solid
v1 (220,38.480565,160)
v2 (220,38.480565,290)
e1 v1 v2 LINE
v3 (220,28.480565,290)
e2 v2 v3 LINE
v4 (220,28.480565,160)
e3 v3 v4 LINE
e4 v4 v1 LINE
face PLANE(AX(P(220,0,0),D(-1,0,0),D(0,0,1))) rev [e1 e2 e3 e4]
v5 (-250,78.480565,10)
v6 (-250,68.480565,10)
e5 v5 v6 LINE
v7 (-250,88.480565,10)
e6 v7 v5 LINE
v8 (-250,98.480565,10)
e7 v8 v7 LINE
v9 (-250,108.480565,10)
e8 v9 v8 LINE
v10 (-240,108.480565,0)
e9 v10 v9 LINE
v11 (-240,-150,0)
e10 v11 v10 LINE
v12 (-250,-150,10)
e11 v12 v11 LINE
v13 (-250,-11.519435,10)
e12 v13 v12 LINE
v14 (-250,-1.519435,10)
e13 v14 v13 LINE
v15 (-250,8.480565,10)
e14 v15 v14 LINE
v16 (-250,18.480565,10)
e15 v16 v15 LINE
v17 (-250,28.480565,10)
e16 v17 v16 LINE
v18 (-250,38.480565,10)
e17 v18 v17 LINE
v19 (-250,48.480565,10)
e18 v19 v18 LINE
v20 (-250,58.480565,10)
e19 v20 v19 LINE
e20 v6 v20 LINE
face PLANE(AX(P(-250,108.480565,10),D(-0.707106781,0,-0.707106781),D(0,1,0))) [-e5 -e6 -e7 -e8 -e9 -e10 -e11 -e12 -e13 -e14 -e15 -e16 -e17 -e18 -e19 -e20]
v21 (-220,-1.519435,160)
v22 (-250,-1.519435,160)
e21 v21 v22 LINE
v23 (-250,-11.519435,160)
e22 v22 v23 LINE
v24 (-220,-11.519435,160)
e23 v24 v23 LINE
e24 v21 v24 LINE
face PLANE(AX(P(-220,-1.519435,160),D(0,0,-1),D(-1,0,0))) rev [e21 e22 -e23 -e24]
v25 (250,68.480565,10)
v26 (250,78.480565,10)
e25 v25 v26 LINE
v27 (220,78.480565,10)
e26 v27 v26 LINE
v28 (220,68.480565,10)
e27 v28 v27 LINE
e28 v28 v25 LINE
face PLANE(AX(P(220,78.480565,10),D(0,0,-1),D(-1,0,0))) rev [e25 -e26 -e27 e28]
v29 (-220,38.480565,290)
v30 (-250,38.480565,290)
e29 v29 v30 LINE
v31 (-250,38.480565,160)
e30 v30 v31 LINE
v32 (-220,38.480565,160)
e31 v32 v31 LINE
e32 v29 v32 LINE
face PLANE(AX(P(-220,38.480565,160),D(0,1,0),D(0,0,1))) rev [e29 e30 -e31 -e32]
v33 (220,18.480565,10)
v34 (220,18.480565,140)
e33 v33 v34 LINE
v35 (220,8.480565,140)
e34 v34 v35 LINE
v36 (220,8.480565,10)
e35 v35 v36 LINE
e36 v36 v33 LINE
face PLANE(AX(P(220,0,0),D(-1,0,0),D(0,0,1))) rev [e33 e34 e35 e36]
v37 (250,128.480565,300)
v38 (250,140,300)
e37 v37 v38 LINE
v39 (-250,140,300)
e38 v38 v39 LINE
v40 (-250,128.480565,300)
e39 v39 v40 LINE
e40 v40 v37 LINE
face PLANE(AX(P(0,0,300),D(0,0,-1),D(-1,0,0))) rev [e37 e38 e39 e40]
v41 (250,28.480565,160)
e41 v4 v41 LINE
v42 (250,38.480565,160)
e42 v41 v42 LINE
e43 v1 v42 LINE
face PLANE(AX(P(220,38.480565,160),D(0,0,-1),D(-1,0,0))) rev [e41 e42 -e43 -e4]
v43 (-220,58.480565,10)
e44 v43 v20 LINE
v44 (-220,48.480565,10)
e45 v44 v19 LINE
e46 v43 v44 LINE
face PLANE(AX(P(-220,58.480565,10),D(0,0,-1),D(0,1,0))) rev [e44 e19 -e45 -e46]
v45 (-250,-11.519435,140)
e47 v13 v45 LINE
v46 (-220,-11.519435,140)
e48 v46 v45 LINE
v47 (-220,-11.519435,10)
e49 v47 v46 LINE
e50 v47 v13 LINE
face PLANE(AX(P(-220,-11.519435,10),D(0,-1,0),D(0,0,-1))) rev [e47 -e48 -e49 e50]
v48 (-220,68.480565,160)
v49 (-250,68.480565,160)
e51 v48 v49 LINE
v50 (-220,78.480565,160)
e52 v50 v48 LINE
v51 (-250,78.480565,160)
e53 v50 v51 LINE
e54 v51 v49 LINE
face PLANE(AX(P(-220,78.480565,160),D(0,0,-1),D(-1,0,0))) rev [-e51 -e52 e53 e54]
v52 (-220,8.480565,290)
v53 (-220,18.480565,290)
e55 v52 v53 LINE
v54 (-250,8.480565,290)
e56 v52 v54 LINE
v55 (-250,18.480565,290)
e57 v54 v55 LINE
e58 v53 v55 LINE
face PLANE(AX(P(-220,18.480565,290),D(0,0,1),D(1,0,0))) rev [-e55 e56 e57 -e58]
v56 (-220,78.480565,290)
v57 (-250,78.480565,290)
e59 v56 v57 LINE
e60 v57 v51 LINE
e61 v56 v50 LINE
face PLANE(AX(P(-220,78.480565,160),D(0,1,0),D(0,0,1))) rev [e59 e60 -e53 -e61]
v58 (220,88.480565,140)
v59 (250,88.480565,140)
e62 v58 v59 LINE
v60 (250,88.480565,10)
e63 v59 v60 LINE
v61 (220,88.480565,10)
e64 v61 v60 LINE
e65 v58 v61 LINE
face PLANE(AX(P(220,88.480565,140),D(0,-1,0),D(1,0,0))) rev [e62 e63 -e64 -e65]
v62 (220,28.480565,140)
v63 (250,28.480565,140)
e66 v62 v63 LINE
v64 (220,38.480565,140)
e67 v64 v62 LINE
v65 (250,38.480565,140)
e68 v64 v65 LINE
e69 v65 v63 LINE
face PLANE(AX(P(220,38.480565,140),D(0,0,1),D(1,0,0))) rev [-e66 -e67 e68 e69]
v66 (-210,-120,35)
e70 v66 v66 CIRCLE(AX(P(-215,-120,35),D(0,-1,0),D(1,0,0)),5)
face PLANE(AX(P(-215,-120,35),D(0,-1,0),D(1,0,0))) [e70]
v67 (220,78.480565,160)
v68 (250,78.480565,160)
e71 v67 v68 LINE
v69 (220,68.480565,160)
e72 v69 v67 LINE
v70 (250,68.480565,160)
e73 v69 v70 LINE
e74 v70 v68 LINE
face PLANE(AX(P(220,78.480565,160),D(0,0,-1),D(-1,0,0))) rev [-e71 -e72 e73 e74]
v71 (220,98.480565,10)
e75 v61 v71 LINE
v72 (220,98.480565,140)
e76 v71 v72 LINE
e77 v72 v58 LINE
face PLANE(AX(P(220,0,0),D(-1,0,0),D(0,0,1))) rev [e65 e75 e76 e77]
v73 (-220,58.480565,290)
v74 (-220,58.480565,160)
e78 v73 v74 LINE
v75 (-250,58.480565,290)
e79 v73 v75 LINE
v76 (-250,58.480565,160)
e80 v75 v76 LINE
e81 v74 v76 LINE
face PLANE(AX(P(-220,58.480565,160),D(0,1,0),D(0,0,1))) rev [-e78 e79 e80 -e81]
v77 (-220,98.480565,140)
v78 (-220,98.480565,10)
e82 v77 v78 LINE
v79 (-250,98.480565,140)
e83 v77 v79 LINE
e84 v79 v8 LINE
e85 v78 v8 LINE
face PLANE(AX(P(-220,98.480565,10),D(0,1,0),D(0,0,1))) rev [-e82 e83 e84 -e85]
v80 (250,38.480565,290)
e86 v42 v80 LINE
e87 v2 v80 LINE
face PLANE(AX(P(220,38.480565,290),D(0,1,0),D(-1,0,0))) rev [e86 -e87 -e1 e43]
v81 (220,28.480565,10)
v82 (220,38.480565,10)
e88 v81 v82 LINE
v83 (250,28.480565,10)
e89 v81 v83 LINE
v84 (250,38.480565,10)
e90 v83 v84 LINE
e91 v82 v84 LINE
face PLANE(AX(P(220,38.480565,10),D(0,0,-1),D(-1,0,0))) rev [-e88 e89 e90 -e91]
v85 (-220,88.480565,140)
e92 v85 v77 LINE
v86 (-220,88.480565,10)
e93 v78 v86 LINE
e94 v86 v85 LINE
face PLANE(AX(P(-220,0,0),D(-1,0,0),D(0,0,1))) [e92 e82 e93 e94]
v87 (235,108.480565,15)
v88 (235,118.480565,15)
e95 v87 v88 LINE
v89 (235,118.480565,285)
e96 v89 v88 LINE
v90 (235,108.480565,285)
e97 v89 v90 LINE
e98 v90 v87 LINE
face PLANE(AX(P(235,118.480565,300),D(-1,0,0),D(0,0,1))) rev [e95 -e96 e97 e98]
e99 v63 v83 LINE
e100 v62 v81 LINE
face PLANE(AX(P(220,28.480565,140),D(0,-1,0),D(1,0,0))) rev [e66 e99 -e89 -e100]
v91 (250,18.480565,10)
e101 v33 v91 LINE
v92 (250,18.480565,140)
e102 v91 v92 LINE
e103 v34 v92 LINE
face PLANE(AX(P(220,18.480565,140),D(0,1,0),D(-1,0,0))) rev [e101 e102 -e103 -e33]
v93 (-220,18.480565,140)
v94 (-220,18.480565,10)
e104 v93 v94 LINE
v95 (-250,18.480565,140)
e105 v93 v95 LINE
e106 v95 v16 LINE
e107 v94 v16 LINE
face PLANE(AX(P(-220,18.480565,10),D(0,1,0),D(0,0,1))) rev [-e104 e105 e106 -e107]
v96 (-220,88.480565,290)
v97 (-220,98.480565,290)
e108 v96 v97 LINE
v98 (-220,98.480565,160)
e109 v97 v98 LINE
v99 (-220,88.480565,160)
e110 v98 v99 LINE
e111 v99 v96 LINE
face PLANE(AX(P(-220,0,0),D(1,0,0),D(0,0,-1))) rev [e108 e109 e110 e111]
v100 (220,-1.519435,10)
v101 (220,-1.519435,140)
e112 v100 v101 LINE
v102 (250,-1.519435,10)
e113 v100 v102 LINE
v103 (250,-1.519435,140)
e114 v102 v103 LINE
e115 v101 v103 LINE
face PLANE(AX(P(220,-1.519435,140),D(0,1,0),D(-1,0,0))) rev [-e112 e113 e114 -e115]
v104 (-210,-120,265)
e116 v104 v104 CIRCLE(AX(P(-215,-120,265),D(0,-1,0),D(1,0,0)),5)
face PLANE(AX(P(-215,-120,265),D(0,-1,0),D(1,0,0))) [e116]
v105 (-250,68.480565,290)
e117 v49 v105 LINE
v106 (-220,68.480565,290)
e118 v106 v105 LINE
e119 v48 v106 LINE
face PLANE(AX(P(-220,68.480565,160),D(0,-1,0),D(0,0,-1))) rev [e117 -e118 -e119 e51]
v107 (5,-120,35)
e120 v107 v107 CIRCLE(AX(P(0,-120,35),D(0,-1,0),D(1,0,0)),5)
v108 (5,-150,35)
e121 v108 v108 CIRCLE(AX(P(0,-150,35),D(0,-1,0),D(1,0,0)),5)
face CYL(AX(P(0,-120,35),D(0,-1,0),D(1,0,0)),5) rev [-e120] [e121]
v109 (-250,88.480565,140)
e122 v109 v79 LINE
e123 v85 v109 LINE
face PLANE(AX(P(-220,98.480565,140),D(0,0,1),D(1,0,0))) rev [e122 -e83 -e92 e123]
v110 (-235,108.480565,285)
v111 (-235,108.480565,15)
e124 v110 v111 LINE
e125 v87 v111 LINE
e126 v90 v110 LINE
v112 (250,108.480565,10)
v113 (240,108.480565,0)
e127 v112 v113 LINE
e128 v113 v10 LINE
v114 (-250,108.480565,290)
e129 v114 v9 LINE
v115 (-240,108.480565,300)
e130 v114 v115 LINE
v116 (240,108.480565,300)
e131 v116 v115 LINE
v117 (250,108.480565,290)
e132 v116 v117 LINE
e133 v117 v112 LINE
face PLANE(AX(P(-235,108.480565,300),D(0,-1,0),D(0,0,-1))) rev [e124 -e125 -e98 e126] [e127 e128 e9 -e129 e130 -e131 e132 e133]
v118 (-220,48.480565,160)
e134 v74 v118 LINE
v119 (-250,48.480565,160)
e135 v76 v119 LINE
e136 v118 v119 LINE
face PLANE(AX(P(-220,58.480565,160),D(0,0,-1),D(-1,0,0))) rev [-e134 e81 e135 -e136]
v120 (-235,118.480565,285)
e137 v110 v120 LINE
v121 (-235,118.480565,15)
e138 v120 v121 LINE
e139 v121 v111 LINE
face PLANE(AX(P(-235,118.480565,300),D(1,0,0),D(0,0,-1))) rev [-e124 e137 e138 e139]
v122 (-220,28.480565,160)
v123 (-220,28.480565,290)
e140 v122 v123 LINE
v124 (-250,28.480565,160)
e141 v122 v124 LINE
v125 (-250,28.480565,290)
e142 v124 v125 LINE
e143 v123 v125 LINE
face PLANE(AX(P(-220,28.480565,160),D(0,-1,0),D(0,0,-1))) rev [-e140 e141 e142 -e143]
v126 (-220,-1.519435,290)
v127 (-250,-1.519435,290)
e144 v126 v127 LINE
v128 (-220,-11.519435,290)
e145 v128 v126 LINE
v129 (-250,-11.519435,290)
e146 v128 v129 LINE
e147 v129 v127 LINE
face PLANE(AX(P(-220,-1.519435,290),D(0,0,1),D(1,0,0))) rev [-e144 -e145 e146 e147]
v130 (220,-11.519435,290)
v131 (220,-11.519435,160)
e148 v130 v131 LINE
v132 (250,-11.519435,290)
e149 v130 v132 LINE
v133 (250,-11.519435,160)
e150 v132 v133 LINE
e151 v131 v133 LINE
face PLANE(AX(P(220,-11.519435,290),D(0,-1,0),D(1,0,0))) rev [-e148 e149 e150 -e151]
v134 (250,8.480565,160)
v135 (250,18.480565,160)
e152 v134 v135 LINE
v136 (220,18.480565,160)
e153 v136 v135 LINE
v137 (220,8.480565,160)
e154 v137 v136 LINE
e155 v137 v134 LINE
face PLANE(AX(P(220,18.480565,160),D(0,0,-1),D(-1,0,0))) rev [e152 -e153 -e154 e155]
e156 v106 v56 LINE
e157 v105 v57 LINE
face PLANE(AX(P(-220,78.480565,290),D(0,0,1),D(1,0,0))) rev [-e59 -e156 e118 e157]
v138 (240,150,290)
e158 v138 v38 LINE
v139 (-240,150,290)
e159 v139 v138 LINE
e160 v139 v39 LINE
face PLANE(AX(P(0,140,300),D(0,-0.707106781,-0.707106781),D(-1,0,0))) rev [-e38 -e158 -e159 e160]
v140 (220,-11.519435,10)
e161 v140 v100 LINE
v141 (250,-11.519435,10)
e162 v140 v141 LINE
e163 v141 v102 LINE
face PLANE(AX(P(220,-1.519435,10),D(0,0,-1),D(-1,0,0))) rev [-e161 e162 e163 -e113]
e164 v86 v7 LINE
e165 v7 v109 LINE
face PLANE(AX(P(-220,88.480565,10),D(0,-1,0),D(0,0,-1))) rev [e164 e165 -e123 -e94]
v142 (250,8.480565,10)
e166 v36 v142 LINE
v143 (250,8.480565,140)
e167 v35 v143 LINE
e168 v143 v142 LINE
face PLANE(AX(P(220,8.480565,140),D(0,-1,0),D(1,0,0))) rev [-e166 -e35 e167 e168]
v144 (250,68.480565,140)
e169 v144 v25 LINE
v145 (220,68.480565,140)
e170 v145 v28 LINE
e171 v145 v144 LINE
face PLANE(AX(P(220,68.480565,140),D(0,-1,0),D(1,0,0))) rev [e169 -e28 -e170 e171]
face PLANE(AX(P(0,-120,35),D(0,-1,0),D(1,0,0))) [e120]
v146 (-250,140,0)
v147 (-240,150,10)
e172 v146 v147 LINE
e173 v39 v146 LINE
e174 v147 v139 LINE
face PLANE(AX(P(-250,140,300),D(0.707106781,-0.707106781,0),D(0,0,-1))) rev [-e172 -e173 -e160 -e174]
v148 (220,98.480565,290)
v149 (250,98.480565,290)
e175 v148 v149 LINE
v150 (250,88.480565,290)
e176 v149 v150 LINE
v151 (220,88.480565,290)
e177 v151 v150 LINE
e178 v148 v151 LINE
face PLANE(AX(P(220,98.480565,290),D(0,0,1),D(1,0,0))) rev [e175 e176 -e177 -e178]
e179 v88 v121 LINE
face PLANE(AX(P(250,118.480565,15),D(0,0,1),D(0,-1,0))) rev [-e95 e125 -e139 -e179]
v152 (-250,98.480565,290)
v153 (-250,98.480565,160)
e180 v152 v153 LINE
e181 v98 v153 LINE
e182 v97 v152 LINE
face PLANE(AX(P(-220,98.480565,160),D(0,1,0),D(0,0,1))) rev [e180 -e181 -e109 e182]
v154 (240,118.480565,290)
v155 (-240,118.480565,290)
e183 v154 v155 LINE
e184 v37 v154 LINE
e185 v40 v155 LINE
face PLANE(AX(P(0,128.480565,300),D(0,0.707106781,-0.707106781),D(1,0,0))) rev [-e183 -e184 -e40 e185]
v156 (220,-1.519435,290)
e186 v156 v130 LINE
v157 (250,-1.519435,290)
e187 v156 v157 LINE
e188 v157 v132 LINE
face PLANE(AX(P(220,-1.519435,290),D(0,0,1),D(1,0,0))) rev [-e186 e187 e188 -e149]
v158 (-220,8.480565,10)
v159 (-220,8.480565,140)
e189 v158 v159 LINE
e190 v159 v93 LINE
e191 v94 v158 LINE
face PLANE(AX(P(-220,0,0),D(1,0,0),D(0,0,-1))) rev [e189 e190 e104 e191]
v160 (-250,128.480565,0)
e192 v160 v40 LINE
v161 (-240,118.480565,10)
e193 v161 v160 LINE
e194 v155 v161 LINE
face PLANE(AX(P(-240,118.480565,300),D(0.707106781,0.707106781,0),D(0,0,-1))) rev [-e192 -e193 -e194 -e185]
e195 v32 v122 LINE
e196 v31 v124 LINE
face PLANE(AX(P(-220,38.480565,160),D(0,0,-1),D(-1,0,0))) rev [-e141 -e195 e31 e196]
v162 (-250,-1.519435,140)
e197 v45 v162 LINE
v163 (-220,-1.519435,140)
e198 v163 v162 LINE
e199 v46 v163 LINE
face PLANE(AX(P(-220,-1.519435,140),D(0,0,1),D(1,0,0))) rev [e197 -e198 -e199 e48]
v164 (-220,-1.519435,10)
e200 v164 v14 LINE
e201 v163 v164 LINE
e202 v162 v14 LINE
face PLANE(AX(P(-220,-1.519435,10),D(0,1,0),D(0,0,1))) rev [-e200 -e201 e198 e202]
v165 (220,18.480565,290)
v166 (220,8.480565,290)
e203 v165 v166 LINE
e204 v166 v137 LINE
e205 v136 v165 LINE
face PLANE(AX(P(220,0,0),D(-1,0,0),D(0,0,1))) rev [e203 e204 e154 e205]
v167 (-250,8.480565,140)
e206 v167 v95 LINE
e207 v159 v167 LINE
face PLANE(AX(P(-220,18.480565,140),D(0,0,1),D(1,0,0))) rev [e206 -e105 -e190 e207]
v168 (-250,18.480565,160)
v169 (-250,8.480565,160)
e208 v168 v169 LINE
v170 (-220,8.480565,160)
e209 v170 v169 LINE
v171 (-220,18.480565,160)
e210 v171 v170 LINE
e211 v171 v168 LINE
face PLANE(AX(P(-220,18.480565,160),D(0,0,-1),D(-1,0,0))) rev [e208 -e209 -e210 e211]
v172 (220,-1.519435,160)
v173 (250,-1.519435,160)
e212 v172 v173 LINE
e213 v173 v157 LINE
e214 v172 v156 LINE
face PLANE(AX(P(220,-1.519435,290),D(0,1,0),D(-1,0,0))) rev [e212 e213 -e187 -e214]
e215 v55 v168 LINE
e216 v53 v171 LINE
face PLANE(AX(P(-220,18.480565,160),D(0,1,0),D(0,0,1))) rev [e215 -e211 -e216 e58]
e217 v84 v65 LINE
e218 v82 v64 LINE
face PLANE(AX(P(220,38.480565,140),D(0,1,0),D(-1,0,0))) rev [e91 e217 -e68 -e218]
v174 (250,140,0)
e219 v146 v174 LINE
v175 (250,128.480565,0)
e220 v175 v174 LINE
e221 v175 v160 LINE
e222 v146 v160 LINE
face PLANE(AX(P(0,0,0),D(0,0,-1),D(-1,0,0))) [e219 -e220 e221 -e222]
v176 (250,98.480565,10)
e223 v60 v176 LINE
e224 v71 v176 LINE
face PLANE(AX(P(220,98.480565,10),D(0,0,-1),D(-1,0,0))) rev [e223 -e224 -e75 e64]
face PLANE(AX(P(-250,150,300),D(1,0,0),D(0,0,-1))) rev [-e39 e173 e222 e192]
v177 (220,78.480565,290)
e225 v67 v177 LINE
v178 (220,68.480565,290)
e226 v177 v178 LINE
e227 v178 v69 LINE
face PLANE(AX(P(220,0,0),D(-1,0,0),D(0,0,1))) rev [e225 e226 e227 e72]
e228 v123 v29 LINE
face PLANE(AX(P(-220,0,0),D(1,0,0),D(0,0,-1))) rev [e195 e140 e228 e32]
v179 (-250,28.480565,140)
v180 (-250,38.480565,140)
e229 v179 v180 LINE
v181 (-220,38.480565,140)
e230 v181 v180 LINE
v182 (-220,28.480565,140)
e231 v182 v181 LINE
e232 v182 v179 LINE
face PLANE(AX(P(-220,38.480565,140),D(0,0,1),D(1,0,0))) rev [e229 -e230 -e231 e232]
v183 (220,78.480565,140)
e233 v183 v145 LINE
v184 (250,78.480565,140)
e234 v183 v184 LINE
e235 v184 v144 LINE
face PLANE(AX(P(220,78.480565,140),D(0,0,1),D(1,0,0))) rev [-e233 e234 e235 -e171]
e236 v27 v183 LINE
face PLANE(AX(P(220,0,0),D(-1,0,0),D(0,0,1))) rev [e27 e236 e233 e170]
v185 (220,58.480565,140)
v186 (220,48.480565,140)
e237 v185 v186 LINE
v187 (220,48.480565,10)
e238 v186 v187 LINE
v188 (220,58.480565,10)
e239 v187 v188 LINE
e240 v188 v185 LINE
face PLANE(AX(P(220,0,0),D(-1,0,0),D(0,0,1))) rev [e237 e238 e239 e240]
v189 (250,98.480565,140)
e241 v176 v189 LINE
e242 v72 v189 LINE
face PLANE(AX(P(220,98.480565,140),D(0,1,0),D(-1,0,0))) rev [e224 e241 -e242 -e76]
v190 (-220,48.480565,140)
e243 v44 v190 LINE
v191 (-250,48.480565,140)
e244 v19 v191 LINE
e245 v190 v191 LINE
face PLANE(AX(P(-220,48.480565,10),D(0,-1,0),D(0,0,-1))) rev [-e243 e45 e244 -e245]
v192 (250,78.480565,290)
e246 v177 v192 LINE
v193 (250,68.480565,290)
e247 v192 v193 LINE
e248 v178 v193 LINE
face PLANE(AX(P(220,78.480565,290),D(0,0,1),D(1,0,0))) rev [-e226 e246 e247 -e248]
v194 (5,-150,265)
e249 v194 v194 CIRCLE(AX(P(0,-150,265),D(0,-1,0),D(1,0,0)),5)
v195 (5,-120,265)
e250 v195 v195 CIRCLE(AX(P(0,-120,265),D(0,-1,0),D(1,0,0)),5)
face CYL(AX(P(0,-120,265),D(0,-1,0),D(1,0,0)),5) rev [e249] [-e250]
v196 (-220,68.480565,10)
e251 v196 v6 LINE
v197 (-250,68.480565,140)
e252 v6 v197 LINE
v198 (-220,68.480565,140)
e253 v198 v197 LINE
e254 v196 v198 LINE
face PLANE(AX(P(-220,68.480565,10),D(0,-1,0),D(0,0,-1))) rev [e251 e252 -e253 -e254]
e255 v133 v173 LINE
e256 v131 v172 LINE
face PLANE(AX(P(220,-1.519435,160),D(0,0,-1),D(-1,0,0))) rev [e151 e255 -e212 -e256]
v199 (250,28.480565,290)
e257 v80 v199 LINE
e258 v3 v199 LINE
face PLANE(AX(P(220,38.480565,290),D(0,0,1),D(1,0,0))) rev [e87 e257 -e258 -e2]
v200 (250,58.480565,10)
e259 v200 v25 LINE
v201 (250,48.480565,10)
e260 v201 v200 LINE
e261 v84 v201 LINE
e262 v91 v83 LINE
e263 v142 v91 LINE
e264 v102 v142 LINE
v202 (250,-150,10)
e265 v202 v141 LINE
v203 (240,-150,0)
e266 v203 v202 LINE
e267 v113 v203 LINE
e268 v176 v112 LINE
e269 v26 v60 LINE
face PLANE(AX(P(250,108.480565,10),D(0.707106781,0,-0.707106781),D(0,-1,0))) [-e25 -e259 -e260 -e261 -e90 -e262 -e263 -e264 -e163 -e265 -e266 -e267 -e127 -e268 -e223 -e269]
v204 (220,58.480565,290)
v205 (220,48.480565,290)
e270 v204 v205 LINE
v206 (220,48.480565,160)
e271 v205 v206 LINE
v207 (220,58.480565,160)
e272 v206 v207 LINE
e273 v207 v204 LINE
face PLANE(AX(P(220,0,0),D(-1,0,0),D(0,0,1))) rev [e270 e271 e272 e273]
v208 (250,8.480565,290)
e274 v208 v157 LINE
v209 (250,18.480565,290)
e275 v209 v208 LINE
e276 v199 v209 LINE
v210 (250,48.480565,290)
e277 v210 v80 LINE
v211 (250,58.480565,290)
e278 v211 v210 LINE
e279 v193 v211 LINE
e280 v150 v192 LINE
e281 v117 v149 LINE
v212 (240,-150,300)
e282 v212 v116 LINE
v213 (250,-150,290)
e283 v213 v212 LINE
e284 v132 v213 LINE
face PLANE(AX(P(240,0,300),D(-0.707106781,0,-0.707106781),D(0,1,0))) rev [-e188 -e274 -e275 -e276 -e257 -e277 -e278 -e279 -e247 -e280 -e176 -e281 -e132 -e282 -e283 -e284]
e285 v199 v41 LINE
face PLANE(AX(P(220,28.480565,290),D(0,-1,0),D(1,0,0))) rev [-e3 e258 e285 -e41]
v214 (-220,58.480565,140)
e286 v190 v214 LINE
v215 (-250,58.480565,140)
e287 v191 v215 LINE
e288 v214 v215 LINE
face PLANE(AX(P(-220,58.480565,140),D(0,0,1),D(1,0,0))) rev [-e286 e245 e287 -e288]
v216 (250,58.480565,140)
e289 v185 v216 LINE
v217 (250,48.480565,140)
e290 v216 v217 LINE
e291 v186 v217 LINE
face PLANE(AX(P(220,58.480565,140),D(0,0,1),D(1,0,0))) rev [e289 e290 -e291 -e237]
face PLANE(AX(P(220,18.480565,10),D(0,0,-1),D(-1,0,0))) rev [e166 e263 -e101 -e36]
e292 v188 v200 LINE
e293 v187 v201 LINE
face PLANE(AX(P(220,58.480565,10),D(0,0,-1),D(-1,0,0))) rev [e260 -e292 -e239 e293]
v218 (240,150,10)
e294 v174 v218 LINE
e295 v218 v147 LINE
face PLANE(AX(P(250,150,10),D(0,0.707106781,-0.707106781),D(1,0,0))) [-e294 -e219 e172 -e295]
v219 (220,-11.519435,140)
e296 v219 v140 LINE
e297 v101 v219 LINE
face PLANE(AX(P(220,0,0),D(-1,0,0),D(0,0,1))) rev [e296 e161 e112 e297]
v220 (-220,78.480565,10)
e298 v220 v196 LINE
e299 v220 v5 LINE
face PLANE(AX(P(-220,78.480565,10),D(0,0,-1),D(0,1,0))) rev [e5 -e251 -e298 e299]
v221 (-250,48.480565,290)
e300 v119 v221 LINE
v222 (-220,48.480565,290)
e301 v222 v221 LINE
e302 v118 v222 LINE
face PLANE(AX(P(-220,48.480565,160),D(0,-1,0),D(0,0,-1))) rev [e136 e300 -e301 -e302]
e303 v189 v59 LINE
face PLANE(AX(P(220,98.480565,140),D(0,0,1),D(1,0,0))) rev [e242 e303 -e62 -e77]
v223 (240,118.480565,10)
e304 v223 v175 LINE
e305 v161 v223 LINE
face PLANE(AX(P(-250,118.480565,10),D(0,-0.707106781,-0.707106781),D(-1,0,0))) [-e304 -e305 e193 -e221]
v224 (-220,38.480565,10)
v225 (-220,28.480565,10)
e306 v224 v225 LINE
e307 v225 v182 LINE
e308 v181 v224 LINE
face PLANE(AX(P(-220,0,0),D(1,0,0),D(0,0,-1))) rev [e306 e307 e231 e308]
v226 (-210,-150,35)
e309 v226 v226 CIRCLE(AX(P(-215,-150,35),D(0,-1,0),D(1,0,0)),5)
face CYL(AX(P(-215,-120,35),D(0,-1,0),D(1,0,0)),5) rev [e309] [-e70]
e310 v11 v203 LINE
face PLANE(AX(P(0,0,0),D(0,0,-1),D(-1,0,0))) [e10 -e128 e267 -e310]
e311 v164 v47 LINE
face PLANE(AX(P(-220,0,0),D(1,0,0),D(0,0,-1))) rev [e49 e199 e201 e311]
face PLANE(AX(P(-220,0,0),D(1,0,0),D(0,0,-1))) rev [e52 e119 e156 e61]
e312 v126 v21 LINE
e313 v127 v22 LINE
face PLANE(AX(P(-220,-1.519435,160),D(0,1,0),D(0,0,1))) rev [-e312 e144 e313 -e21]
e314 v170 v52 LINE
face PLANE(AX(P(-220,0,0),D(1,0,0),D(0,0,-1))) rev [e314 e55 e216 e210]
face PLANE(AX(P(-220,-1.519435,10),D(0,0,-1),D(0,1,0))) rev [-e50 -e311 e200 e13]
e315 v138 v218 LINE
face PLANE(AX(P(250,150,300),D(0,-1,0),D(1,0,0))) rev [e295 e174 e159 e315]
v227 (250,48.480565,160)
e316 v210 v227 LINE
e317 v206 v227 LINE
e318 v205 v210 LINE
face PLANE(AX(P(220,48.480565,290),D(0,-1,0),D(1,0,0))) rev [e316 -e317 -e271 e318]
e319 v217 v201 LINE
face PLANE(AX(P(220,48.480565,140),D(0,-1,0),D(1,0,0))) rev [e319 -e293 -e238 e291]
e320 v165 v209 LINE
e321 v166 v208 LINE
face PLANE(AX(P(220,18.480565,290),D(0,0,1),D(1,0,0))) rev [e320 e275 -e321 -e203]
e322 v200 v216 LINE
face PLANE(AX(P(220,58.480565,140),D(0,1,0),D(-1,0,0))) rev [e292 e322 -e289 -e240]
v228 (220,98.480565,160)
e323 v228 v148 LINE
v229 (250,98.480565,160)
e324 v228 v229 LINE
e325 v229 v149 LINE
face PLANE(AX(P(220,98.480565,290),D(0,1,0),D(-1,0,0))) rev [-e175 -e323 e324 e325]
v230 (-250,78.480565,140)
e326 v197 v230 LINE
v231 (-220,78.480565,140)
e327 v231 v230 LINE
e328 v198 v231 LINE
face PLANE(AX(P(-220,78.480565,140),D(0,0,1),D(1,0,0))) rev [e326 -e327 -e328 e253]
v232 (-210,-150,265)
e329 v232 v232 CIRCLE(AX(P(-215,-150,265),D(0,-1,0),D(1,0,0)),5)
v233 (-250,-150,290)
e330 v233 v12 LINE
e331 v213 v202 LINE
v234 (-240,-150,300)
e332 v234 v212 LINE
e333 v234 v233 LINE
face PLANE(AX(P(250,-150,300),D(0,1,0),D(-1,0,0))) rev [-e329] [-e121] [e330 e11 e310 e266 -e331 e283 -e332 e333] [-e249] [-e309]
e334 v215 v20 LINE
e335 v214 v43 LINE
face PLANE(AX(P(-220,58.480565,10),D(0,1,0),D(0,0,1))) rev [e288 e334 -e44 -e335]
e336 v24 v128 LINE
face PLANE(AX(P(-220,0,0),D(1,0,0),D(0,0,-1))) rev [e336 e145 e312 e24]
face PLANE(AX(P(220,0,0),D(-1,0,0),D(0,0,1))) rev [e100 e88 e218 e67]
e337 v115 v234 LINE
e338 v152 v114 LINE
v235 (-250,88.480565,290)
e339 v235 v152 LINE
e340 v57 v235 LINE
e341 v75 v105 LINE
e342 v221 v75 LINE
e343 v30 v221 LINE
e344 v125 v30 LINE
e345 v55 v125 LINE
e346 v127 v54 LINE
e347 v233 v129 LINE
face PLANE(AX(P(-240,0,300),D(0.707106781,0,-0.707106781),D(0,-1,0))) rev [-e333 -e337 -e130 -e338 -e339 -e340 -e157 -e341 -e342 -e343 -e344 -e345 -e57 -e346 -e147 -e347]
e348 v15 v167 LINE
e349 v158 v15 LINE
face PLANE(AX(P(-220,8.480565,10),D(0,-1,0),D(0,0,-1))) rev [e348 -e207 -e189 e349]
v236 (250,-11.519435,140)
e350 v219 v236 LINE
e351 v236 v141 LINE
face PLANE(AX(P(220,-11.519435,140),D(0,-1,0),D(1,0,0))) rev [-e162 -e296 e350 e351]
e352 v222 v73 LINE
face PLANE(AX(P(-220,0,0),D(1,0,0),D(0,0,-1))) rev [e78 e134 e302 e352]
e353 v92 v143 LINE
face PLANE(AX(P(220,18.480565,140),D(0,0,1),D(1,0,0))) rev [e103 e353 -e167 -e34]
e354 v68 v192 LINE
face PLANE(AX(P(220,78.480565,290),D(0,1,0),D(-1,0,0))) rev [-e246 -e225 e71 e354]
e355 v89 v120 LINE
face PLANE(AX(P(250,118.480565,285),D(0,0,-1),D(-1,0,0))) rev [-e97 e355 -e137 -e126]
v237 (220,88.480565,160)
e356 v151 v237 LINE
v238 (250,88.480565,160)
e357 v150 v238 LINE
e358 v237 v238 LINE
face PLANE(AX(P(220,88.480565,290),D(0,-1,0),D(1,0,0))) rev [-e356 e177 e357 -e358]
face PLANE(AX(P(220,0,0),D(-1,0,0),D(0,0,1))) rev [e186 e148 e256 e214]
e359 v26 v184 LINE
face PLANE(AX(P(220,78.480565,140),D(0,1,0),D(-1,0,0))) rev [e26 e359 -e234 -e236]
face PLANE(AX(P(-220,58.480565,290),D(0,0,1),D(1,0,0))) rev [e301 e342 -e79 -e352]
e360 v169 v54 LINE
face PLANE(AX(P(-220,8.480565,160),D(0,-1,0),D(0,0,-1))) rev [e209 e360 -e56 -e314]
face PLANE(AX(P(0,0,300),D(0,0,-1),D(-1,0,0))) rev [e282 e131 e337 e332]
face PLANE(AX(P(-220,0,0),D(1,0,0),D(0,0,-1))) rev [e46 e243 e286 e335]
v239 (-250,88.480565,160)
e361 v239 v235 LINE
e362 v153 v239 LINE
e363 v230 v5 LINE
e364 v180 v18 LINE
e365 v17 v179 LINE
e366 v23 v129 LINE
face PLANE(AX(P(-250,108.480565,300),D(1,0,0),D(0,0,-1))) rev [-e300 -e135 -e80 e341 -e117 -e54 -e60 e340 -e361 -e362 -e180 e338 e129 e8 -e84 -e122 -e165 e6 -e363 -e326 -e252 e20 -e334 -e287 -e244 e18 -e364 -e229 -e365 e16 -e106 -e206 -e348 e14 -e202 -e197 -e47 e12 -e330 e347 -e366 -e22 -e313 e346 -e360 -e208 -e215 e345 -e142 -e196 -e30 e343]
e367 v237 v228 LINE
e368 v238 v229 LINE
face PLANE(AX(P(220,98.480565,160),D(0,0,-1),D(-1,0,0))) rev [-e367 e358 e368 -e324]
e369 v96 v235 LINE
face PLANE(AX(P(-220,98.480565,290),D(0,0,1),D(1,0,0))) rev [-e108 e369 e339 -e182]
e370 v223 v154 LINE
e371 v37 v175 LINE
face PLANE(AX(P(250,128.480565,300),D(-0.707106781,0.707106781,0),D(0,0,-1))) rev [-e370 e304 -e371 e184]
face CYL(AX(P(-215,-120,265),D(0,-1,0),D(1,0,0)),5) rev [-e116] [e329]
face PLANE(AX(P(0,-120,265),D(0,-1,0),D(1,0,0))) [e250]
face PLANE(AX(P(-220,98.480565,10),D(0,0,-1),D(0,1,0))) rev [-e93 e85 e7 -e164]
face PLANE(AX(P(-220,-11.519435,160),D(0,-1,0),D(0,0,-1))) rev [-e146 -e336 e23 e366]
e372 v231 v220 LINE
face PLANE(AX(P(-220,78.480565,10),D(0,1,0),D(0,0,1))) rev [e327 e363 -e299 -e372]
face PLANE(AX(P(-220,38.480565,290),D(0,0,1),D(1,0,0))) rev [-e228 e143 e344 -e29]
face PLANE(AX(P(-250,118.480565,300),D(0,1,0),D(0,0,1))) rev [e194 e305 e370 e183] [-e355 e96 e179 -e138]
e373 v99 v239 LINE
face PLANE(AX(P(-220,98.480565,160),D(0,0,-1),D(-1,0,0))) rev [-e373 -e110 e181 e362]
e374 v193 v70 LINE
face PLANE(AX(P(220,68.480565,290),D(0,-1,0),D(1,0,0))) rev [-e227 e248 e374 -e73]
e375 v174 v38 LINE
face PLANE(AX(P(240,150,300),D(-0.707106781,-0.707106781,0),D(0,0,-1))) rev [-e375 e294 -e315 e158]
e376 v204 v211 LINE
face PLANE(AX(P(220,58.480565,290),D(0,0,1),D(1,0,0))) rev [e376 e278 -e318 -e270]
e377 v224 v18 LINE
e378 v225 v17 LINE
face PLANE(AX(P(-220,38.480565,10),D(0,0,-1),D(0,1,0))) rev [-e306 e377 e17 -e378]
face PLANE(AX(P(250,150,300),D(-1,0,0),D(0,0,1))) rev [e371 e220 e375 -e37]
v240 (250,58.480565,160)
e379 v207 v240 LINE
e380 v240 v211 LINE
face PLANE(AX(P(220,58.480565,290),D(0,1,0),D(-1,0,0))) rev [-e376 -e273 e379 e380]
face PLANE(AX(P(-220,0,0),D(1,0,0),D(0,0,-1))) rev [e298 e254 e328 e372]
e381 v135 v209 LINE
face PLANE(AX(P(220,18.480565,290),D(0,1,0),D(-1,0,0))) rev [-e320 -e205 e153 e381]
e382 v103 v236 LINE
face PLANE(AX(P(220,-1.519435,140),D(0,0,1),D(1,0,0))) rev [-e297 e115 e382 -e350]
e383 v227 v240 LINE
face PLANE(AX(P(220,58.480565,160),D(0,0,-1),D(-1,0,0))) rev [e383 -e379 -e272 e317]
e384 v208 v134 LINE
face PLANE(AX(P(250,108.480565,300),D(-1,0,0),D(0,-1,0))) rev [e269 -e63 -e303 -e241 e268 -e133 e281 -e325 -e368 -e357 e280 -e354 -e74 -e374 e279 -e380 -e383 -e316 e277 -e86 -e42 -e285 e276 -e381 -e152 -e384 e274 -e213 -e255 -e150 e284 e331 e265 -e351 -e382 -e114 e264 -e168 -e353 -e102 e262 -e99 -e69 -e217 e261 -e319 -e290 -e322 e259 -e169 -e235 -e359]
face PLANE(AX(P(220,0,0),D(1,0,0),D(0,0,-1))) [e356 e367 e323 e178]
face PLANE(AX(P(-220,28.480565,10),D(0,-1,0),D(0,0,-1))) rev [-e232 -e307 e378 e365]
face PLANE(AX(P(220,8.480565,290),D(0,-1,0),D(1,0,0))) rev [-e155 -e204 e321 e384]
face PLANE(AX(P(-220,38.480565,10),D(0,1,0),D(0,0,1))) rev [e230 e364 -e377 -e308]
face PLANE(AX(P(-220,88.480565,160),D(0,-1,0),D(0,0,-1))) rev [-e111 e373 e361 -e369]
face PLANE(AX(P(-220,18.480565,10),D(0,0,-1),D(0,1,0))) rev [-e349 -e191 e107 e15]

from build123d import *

# Parameters (mm, degrees)
BOSS_EXTRUDE1_DEPTH = 300
SKETCH2_W           = 15
SKETCH2_H           = 10
CUT_EXTRUDE1_DEPTH  = 603.07972894
SKETCH4_W           = 130
SKETCH4_H           = 10
CUT_EXTRUDE2_DEPTH  = 30
SKETCH7_W           = 130
SKETCH7_H           = 10
CUT_EXTRUDE3_DEPTH  = 30
CHAMFER1_SIZE       = 10
CHAMFER2_SIZE       = 10
CHAMFER3_SIZE       = 10
SKETCH8_R           = 5
CUT_EXTRUDE4_DEPTH  = 30


with BuildPart() as part:
    # Sketch1 → Boss-Extrude1 (new body)
    with BuildSketch(Plane.XY):
        Polygon((250, 118.480565371), (235, 118.480565371), (235, 108.480565371), (250, 108.480565371), (250, -150), (-250, -150), (-250, 108.480565371), (-235, 108.480565371), (-235, 118.480565371), (-250, 118.480565371), (-250, 150), (250, 150), align=None)
    extrude(amount=BOSS_EXTRUDE1_DEPTH)

    # Sketch2 → Cut-Extrude1 (cut, through all)
    with BuildSketch(Plane.ZY.offset(250)):
        with Locations((292.5, 113.480565371)):
            Rectangle(SKETCH2_W, SKETCH2_H)
        with Locations((7.5, 113.480565371)):
            Rectangle(SKETCH2_W, SKETCH2_H)
    extrude(amount=-CUT_EXTRUDE1_DEPTH, mode=Mode.SUBTRACT)

    # Sketch4 → Cut-Extrude2 (cut)
    with BuildSketch(Plane.ZY.offset(250)):
        with Locations((75, 93.480565371)):
            Rectangle(SKETCH4_W, SKETCH4_H)
        with Locations((225, 93.480565371)):
            Rectangle(SKETCH4_W, SKETCH4_H)
        with Locations((225, 73.480565371)):
            Rectangle(SKETCH4_W, SKETCH4_H)
        with Locations((225, 53.480565371)):
            Rectangle(SKETCH4_W, SKETCH4_H)
        with Locations((225, 33.480565371)):
            Rectangle(SKETCH4_W, SKETCH4_H)
        with Locations((225, 13.480565371)):
            Rectangle(SKETCH4_W, SKETCH4_H)
        with Locations((225, -6.519434629)):
            Rectangle(SKETCH4_W, SKETCH4_H)
        with Locations((75, 73.480565371)):
            Rectangle(SKETCH4_W, SKETCH4_H)
        with Locations((75, 53.480565371)):
            Rectangle(SKETCH4_W, SKETCH4_H)
        with Locations((75, 33.480565371)):
            Rectangle(SKETCH4_W, SKETCH4_H)
        with Locations((75, 13.480565371)):
            Rectangle(SKETCH4_W, SKETCH4_H)
        with Locations((75, -6.519434629)):
            Rectangle(SKETCH4_W, SKETCH4_H)
    extrude(amount=-CUT_EXTRUDE2_DEPTH, mode=Mode.SUBTRACT)

    # Sketch7 → Cut-Extrude3 (cut)
    with BuildSketch(Plane(origin=(250, 0, 0), x_dir=(0, 0, -1), z_dir=(1, 0, 0))):
        with Locations((-225, 93.480565371)):
            Rectangle(SKETCH7_W, SKETCH7_H)
        with Locations((-75, 93.480565371)):
            Rectangle(SKETCH7_W, SKETCH7_H)
        with Locations((-75, 73.480565371)):
            Rectangle(SKETCH7_W, SKETCH7_H)
        with Locations((-75, 53.480565371)):
            Rectangle(SKETCH7_W, SKETCH7_H)
        with Locations((-75, 33.480565371)):
            Rectangle(SKETCH7_W, SKETCH7_H)
        with Locations((-75, 13.480565371)):
            Rectangle(SKETCH7_W, SKETCH7_H)
        with Locations((-75, -6.519434629)):
            Rectangle(SKETCH7_W, SKETCH7_H)
        with Locations((-225, 73.480565371)):
            Rectangle(SKETCH7_W, SKETCH7_H)
        with Locations((-225, 53.480565371)):
            Rectangle(SKETCH7_W, SKETCH7_H)
        with Locations((-225, 33.480565371)):
            Rectangle(SKETCH7_W, SKETCH7_H)
        with Locations((-225, 13.480565371)):
            Rectangle(SKETCH7_W, SKETCH7_H)
        with Locations((-225, -6.519434629)):
            Rectangle(SKETCH7_W, SKETCH7_H)
    extrude(amount=-CUT_EXTRUDE3_DEPTH, mode=Mode.SUBTRACT)

    # Chamfer1
    chamfer1_edges = [part.edges().sort_by_distance(p)[0] for p in [
        (0, 150, 0),
        (-250, 150, 150),
        (250, 150, 150),
        (0, 150, 300),
    ]]
    chamfer(chamfer1_edges, length=CHAMFER1_SIZE)

    # Chamfer2
    chamfer2_edges = [part.edges().sort_by_distance(p)[0] for p in [
        (0, 118.480565371, 0),
        (-250, 118.480565371, 150),
        (250, 118.480565371, 150),
        (0, 118.480565371, 300),
    ]]
    chamfer(chamfer2_edges, length=CHAMFER2_SIZE)

    # Chamfer3
    chamfer3_edges = [part.edges().sort_by_distance(p)[0] for p in [
        (250, -20.759717314, 300),
        (250, -20.759717314, 0),
        (-250, -20.759717314, 0),
        (-250, -20.759717314, 300),
    ]]
    chamfer(chamfer3_edges, length=CHAMFER3_SIZE - 0.0001)  # a hair under: the kernel refuses the full size

    # Sketch8 → Cut-Extrude4 (cut)
    with BuildSketch(Plane.XZ.offset(150)):
        with Locations((-215, 35)):
            Circle(SKETCH8_R)
        with Locations((-215, 265)):
            Circle(SKETCH8_R)
        with Locations((0, 265)):
            Circle(SKETCH8_R)
        with Locations((0, 35)):
            Circle(SKETCH8_R)
    extrude(amount=-CUT_EXTRUDE4_DEPTH, mode=Mode.SUBTRACT)


solid = part.part
